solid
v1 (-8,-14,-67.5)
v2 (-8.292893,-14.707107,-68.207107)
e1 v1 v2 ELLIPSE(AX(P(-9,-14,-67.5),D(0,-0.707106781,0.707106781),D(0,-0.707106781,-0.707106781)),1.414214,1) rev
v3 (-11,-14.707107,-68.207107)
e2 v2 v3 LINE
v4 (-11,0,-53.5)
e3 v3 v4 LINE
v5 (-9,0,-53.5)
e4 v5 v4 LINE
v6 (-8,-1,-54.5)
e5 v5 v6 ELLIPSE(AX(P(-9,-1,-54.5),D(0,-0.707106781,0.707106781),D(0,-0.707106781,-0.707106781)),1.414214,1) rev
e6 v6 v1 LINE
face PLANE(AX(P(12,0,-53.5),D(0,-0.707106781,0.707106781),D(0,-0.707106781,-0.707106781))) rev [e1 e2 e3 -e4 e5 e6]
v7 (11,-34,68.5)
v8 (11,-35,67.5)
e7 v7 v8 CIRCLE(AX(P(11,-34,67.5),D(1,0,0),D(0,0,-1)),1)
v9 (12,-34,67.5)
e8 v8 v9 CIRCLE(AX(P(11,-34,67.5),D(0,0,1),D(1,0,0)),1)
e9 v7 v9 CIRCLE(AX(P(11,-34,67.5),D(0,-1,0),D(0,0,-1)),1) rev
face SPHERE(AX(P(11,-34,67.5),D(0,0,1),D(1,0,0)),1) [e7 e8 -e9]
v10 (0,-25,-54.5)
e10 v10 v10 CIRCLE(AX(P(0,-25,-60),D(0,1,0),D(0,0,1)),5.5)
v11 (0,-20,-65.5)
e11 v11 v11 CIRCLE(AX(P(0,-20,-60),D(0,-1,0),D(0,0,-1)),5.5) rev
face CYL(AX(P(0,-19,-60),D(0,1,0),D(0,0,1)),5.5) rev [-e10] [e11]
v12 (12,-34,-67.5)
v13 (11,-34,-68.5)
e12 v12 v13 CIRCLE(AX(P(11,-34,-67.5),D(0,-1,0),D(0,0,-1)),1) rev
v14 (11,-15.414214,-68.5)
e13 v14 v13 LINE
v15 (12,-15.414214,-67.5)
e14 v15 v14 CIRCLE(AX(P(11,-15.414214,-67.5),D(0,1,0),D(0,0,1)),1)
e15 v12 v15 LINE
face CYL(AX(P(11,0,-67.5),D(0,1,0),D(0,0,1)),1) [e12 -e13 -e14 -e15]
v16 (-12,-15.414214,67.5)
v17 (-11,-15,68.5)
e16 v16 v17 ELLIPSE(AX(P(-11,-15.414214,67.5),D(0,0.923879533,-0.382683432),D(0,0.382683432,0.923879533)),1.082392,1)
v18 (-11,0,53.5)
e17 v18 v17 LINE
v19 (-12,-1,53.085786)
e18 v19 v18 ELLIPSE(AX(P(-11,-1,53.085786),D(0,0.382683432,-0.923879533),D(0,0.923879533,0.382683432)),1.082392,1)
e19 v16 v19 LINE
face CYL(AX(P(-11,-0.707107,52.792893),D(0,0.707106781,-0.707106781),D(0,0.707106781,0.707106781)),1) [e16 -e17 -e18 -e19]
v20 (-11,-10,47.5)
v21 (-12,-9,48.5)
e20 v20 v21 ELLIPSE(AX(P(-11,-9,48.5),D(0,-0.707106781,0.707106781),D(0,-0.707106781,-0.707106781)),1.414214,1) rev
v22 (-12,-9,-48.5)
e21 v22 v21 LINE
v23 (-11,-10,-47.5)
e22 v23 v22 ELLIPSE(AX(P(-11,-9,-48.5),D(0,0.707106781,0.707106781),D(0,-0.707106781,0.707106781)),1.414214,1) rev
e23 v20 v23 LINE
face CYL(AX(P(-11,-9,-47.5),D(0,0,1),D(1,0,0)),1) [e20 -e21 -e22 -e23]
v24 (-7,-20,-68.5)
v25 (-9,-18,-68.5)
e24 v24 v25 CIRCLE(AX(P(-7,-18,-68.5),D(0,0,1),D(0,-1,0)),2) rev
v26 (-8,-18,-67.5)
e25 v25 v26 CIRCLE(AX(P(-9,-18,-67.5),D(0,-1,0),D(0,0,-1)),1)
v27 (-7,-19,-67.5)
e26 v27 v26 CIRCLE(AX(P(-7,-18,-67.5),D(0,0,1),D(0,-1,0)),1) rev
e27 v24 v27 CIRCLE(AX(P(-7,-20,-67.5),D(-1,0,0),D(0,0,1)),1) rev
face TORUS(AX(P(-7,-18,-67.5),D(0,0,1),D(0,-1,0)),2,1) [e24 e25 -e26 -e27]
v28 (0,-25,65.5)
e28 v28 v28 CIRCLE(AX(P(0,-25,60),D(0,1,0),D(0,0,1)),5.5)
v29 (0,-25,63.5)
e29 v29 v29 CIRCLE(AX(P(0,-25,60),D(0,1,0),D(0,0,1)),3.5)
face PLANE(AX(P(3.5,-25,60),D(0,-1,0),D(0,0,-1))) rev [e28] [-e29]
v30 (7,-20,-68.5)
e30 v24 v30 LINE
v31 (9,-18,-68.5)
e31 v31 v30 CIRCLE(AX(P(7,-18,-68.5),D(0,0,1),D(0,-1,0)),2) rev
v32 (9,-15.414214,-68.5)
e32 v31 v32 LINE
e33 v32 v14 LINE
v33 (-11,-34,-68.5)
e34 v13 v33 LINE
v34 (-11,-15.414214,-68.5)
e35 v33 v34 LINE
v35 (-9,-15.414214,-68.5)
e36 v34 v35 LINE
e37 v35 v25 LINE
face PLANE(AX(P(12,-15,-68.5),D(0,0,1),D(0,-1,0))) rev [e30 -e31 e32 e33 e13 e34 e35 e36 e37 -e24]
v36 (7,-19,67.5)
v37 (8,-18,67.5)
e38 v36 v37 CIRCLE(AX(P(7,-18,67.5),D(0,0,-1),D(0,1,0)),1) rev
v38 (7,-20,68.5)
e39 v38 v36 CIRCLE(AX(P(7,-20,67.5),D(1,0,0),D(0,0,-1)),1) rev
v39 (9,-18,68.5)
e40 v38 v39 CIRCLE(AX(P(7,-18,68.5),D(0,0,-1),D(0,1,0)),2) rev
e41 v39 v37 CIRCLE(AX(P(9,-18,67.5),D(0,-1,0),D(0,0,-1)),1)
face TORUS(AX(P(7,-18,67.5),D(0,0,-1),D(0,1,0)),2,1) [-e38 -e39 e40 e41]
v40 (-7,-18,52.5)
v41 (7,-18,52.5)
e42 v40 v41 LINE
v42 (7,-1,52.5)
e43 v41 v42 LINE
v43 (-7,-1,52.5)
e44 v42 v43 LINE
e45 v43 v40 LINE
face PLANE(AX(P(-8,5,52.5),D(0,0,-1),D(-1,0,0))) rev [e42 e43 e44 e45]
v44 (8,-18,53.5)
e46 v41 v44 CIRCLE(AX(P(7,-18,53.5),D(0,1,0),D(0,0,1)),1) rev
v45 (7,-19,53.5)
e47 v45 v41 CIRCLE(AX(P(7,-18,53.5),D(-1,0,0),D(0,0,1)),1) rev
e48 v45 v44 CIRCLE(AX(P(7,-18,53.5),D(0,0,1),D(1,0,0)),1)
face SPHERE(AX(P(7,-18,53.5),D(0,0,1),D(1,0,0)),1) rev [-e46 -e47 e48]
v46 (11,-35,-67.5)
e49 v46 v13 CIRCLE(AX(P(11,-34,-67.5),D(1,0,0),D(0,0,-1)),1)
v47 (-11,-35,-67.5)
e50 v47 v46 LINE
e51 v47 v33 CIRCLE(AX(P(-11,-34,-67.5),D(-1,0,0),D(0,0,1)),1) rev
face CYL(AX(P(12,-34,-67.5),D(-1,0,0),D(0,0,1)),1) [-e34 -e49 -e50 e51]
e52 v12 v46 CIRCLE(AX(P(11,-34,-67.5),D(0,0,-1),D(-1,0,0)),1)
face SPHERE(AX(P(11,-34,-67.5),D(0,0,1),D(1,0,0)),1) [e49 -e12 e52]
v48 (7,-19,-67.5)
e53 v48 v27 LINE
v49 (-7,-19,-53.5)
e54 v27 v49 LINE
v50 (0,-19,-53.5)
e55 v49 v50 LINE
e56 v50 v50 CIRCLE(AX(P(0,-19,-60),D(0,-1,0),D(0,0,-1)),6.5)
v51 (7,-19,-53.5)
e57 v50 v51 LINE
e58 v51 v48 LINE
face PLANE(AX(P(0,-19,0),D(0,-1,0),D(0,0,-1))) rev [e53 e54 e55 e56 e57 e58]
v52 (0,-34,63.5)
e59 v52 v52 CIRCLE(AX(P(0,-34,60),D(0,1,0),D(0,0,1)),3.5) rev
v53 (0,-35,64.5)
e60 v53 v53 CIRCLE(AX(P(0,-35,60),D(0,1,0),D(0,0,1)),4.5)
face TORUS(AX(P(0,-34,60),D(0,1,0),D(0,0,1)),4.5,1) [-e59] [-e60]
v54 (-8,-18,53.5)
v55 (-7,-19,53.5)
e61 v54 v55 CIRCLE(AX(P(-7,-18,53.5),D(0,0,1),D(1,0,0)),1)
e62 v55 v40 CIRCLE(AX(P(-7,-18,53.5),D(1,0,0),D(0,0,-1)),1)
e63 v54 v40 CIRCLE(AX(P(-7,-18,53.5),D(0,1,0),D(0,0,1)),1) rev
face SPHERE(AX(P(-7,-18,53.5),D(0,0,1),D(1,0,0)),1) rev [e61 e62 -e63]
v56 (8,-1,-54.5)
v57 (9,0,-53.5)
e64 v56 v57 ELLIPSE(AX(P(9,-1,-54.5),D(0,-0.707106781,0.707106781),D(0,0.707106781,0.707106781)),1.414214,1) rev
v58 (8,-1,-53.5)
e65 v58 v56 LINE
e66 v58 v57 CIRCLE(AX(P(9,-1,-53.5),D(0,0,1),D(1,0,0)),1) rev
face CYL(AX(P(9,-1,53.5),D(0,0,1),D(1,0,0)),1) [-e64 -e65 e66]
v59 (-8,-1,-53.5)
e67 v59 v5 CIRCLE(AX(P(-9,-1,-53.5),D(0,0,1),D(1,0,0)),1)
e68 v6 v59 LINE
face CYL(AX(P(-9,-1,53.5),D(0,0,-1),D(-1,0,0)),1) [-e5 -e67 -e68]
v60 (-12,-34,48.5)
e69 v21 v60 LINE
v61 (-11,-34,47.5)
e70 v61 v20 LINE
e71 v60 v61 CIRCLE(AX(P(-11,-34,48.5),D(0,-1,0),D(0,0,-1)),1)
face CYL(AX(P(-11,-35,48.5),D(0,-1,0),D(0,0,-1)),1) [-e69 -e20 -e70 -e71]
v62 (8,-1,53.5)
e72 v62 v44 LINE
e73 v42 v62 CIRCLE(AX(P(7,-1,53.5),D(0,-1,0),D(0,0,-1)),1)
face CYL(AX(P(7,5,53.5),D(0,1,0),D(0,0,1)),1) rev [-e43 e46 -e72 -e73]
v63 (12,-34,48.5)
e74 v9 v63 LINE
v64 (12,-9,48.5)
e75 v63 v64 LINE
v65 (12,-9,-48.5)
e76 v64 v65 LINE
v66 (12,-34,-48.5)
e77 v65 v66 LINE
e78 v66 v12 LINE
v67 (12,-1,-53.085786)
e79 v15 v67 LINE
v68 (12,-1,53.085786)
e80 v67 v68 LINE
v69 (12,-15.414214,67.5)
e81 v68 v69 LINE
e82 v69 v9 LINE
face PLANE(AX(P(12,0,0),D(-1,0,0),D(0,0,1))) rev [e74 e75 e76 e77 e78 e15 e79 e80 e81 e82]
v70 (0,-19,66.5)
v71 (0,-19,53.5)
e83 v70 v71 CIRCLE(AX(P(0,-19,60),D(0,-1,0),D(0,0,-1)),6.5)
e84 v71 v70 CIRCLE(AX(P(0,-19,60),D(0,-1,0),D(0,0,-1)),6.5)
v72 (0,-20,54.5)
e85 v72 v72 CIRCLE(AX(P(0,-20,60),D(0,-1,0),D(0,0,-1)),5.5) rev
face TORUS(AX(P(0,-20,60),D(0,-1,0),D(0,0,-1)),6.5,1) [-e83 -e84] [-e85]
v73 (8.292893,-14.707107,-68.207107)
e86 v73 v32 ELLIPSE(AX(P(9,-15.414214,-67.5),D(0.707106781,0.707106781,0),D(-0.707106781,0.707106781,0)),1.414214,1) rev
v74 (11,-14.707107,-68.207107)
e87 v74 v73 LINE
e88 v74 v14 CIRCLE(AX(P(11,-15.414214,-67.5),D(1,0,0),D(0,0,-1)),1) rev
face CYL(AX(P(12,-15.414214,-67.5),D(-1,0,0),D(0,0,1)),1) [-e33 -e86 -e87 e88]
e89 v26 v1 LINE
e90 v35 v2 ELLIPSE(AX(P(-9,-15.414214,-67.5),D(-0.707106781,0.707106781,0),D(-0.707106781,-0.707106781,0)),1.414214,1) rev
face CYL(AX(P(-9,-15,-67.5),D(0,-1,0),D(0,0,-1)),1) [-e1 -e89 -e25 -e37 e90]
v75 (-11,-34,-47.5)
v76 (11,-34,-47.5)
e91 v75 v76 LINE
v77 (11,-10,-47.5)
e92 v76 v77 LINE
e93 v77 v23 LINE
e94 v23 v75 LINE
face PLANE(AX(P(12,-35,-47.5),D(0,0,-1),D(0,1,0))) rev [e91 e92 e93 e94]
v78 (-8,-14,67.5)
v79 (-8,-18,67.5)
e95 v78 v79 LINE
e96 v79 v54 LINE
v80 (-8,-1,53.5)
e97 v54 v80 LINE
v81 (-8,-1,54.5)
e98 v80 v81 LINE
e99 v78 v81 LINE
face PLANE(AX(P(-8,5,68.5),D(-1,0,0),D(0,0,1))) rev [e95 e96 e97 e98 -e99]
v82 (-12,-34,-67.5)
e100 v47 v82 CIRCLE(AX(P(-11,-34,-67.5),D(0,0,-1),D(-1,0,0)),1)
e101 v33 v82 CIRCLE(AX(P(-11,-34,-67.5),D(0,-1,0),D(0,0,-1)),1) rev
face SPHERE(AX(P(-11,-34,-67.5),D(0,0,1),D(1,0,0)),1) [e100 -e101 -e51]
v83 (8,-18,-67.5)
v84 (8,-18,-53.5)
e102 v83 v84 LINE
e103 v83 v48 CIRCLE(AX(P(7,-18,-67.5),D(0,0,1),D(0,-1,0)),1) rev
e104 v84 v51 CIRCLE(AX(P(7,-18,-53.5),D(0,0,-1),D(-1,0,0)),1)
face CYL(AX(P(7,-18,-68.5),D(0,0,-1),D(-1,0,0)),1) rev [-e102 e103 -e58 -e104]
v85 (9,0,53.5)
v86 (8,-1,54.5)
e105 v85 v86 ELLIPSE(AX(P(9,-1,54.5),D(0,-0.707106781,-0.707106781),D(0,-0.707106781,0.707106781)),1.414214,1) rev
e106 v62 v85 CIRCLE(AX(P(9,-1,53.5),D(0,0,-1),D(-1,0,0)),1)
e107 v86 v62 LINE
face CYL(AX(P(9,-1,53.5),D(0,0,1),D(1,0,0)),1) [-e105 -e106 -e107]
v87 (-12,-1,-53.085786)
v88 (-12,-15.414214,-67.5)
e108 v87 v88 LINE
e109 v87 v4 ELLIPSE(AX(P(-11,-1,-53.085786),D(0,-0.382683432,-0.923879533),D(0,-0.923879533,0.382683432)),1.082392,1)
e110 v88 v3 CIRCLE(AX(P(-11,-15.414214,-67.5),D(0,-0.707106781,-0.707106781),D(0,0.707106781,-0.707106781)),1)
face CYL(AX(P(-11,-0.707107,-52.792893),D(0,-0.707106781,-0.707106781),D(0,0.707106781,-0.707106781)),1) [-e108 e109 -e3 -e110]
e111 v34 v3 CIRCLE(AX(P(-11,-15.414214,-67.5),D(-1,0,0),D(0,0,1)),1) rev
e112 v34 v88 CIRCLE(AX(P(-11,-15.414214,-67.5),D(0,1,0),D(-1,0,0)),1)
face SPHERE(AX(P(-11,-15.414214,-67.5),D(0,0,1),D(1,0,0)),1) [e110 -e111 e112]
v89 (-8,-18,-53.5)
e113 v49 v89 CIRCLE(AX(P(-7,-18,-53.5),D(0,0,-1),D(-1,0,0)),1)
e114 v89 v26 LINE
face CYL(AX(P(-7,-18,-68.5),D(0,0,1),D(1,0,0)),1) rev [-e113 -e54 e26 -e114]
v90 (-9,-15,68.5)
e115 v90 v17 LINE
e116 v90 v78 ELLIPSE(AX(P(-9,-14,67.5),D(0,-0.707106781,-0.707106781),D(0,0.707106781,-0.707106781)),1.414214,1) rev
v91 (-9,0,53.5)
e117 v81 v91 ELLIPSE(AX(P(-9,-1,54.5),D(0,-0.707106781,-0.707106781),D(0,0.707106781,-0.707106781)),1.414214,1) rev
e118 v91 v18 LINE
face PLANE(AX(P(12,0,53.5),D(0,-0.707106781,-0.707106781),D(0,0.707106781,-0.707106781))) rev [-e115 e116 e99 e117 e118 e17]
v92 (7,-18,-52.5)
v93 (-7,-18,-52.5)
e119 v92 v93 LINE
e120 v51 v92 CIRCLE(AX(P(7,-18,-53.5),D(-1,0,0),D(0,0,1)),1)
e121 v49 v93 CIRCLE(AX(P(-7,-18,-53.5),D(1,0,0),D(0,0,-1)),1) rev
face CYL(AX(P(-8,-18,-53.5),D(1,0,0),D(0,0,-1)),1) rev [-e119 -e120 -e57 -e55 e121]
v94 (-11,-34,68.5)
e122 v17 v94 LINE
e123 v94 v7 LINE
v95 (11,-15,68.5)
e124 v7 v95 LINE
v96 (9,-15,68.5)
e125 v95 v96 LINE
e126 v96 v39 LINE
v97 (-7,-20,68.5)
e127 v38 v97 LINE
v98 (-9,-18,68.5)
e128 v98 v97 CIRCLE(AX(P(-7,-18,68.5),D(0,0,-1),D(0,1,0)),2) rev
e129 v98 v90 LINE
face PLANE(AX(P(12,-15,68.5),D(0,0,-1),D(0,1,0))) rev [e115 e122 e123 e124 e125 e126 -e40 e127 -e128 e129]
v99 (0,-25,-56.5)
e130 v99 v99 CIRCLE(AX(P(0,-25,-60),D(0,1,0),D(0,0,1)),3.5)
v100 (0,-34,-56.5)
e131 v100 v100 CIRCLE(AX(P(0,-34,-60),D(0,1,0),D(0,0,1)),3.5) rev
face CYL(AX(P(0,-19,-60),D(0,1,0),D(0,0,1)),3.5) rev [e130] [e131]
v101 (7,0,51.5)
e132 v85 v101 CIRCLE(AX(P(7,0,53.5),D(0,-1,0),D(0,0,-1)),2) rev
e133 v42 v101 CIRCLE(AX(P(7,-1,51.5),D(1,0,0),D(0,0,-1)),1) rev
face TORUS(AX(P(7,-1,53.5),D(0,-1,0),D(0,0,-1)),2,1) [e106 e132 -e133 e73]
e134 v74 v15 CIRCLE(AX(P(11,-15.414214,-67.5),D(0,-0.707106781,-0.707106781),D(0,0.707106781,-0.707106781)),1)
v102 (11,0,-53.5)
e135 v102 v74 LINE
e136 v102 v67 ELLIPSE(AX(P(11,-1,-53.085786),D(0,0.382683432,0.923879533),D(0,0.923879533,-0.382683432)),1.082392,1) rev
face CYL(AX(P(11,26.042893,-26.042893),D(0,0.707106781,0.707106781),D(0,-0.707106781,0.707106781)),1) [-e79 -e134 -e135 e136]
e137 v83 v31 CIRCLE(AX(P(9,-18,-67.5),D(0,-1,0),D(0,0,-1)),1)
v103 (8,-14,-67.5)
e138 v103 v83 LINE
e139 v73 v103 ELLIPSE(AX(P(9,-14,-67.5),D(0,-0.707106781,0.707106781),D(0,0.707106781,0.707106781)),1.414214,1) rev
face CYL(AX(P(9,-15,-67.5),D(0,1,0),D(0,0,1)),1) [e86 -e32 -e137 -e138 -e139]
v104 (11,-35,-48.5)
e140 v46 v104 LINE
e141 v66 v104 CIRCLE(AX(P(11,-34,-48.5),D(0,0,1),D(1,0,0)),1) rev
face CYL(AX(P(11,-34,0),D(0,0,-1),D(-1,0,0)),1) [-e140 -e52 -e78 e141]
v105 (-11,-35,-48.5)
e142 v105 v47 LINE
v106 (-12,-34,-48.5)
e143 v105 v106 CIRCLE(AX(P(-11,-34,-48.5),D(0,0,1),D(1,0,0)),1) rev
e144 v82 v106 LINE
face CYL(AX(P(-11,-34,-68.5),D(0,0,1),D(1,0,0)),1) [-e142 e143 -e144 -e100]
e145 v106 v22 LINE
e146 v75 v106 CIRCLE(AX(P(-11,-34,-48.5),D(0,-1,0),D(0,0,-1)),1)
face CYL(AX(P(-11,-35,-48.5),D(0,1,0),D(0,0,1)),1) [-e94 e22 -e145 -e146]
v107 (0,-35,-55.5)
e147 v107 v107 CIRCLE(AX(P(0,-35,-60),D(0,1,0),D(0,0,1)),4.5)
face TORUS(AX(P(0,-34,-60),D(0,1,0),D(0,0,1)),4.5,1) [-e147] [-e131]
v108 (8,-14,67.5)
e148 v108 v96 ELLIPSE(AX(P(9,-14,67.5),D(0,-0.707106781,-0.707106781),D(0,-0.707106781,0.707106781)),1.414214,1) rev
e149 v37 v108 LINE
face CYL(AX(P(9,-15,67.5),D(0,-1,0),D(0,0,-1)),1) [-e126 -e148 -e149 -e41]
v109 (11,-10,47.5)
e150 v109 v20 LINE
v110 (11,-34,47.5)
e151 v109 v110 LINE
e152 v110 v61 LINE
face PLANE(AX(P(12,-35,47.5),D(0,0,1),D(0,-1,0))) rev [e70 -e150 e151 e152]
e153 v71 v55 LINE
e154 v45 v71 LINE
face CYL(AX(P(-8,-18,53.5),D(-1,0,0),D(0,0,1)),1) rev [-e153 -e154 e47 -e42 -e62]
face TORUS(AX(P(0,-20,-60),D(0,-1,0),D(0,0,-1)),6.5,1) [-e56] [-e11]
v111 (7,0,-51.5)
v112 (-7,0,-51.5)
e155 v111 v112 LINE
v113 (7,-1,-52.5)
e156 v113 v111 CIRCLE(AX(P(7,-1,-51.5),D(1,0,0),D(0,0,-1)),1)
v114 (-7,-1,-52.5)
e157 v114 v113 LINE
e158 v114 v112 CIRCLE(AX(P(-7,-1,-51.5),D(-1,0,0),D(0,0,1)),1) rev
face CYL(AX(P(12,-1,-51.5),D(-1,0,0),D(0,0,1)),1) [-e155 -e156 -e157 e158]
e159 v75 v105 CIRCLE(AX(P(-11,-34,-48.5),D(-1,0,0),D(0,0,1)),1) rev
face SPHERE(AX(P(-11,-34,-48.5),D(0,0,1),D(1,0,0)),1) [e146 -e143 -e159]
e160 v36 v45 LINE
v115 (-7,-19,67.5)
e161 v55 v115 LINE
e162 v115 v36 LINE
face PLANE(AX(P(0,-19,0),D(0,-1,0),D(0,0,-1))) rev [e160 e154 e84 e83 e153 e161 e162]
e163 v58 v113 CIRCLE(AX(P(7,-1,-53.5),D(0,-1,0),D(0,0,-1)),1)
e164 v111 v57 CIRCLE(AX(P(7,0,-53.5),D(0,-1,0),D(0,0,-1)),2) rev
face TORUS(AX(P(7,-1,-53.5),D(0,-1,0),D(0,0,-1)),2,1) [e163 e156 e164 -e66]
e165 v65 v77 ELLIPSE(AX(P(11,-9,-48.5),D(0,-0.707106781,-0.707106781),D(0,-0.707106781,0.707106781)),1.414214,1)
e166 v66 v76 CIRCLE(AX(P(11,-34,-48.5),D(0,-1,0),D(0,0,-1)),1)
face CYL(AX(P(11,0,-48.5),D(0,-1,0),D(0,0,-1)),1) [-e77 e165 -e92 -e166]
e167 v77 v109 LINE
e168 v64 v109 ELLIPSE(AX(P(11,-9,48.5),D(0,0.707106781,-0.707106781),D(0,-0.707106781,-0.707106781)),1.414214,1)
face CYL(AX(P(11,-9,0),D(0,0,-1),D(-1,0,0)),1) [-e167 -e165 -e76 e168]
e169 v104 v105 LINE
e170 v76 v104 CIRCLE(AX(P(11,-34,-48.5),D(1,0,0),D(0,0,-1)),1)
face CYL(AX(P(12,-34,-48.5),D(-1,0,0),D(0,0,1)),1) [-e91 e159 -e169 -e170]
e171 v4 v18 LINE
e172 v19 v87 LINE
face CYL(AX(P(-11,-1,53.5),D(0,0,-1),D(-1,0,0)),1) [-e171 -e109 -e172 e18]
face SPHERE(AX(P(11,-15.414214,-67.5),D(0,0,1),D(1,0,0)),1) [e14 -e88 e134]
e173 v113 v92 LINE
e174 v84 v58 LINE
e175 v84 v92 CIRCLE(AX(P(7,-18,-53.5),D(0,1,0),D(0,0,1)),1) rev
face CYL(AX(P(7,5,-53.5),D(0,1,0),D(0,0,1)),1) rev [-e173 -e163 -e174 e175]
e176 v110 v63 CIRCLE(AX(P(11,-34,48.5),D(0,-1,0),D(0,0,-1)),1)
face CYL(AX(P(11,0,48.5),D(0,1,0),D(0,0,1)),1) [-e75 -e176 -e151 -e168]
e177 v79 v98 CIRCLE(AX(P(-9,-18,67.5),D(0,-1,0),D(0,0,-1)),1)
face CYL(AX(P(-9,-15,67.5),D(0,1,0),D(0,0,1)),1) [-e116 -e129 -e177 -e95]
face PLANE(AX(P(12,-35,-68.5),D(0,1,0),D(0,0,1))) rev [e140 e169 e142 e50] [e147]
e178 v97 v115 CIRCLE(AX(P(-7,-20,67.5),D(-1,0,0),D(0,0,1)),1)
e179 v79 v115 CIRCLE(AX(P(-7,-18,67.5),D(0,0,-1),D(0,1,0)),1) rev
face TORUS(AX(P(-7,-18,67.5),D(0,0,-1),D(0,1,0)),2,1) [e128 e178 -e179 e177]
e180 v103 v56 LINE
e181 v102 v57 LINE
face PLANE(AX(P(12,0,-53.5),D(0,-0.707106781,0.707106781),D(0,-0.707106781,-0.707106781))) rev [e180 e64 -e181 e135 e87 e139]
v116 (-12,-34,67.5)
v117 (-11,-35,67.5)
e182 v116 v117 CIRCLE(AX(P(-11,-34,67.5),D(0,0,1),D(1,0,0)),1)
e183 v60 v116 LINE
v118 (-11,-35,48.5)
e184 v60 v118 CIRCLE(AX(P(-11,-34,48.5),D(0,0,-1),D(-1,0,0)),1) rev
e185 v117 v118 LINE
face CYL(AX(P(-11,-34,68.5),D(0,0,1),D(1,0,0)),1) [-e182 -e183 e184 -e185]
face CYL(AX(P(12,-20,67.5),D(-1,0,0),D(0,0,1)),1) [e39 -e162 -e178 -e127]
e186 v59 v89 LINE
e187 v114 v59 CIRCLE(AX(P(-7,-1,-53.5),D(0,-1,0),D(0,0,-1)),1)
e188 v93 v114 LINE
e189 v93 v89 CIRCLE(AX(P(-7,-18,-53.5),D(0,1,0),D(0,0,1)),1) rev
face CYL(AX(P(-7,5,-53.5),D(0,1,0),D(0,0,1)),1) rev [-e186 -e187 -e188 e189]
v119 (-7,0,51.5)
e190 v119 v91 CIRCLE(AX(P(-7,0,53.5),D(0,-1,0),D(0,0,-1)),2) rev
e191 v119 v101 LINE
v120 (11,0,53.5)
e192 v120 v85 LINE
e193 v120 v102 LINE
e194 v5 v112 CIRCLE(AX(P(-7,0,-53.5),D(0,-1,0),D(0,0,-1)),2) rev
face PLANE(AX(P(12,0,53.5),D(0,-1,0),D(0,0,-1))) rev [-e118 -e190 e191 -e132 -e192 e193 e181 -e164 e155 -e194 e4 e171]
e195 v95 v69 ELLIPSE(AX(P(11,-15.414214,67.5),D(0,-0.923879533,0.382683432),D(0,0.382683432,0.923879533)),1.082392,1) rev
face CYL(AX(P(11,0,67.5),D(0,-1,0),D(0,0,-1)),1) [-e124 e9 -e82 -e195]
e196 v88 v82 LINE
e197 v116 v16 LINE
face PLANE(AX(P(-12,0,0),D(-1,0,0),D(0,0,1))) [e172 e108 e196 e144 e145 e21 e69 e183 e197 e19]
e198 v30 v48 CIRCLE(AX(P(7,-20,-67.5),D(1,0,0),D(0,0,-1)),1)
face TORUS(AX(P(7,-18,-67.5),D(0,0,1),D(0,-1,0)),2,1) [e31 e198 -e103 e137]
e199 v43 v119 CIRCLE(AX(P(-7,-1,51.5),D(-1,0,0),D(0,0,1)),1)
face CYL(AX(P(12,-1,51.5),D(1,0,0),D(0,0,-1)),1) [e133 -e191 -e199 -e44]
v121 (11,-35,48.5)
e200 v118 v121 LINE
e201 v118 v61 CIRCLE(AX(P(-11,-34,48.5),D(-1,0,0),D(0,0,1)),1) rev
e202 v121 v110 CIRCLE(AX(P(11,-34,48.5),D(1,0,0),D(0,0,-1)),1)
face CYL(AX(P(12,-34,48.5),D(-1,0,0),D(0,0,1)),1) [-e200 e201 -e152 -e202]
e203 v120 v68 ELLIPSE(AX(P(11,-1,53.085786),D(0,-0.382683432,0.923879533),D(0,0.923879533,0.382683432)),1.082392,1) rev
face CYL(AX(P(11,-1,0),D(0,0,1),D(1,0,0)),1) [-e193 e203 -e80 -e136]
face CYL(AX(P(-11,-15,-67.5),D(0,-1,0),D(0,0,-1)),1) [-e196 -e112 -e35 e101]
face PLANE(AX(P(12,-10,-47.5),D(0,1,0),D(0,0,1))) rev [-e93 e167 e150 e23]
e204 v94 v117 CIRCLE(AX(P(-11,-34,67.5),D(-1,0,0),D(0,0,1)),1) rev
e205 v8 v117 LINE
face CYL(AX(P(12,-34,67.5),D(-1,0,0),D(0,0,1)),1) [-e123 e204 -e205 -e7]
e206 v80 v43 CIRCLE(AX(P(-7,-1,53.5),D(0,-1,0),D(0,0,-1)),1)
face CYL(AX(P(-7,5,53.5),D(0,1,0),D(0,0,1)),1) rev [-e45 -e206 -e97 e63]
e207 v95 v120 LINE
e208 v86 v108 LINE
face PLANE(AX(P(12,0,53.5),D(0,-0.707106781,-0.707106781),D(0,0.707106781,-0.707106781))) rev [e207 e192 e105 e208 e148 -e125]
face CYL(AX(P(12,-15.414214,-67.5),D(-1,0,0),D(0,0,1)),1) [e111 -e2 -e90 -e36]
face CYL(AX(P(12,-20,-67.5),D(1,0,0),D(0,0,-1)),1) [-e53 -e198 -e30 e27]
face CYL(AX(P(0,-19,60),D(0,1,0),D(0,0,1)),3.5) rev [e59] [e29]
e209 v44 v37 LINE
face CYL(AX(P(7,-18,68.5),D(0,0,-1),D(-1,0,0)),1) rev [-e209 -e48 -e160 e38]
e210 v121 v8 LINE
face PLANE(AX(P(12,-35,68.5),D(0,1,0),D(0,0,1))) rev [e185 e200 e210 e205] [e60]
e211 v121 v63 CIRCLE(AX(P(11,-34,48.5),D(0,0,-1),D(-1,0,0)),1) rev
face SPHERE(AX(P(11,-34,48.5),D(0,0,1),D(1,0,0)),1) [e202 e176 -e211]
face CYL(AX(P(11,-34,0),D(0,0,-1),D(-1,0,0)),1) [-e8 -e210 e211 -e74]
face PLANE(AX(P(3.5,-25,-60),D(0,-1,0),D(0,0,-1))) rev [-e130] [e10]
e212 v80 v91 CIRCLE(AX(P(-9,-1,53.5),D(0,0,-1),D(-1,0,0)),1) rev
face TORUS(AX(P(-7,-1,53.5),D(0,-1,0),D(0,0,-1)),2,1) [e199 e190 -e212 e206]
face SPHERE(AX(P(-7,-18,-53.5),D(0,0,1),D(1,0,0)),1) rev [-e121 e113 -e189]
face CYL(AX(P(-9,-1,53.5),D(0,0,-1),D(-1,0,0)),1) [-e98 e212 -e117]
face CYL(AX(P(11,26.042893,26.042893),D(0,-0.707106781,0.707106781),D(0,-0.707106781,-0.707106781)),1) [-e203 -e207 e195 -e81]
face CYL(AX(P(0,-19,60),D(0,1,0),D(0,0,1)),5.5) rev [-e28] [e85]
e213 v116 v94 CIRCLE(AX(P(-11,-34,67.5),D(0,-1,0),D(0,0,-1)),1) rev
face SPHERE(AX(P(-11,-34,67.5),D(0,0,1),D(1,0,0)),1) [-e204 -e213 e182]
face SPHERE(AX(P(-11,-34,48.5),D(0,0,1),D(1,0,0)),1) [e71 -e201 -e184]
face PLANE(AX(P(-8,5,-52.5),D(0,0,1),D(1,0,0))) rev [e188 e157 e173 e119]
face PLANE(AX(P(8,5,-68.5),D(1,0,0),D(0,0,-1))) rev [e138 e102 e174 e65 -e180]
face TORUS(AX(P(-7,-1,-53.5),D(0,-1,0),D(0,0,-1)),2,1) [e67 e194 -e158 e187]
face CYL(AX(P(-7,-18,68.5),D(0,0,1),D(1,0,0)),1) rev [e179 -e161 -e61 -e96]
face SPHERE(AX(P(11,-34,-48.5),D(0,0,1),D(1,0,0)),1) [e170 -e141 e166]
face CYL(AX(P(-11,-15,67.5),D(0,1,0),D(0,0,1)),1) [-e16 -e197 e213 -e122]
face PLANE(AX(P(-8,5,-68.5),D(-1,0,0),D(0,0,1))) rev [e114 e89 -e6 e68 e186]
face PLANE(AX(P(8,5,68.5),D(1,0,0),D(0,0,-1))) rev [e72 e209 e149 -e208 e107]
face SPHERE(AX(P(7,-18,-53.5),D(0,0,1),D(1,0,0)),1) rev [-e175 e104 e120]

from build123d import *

# Parameters (mm, degrees)
EXTRUDE_1_DEPTH             = 12
SKETCH_2_W                  = 16
SKETCH_2_H                  = 16
CUT_EXTRUDE_1_DEPTH         = 24
HOLE_WIZARD_C_3_D           = 7
HOLE_WIZARD_C_3_CBORE_D     = 11
HOLE_WIZARD_C_3_CBORE_DEPTH = 6
FILLET_1_R                  = 1


with BuildPart() as part:
    # 草图1 → 凸台-拉伸1 (new, symmetric)
    with BuildSketch(Plane(origin=(0, 0, 0), x_dir=(0, 0, -1), z_dir=(1, 0, 0))):
        Polygon((-53.5, 0), (53.5, 0), (68.5, -15), (68.5, -35), (47.5, -35), (47.5, -10), (-47.5, -10), (-47.5, -35), (-68.5, -35), (-68.5, -15), align=None)
    extrude(amount=EXTRUDE_1_DEPTH, both=True)

    # 草图2 → 切除-拉伸1 (cut)
    with BuildSketch(Plane(origin=(0, -19, 0), x_dir=(-1, 0, 0), z_dir=(0, -1, 0))):
        with Locations((0, -60.5)):
            Rectangle(SKETCH_2_W, SKETCH_2_H)
        with Locations((0, 60.5)):
            Rectangle(SKETCH_2_W, SKETCH_2_H)
    extrude(amount=-CUT_EXTRUDE_1_DEPTH, mode=Mode.SUBTRACT)

    # 打孔尺寸根据六角头螺栓 C 级的类型3 (through all)
    with Locations(Plane(origin=(0, -19, 0), x_dir=(1, 0, 0), z_dir=(0, 1, 0))):
        with Locations((0, -60), (0, 60)):
            CounterBoreHole(HOLE_WIZARD_C_3_D / 2, HOLE_WIZARD_C_3_CBORE_D / 2, HOLE_WIZARD_C_3_CBORE_DEPTH)

    # 圆角1
    fillet_1_edges = [part.edges().sort_by_distance(p)[0] for p in [
        (12, -7.5, 61),
        (-12, -22.5, -47.5),
        (-12, -10, 0),
        (-12, -22.5, 47.5),
        (-12, -35, 58),
        (-12, -25, 68.5),
        (-12, -7.5, 61),
        (-12, 0, 0),
        (-12, -7.5, -61),
        (12, -25, 68.5),
        (12, -35, 58),
        (10, -15, -68.5),
        (0, -35, -68.5),
        (0, -35, -47.5),
        (0, -35, 47.5),
        (0, -35, 68.5),
        (12, -22.5, 47.5),
        (12, -10, 0),
        (12, -22.5, -47.5),
        (12, -35, -58),
        (8, -17, 68.5),
        (-8, -17, 68.5),
        (12, -25, -68.5),
        (0, 0, 52.5),
        (8, -9.5, 52.5),
        (-8, 0, 53),
        (-8, -9.5, 52.5),
        (8, 0, 53),
        (-8, -19, 60.5),
        (0, -19, 52.5),
        (8, -19, 60.5),
        (0, -19, 68.5),
        (12, -7.5, -61),
        (-10, -15, -68.5),
        (8, -17, -68.5),
        (-8, -17, -68.5),
        (0, 0, -52.5),
        (-8, -9.5, -52.5),
        (-8, 0, -53),
        (8, 0, -53),
        (8, -9.5, -52.5),
        (0, -19, -68.5),
        (8, -19, -60.5),
        (0, -19, -52.5),
        (-8, -19, -60.5),
        (-5.5, -19, -60),
        (3.5, -35, -60),
        (12, 0, 0),
        (-5.5, -19, 60),
        (3.5, -35, 60),
        (-12, -25, -68.5),
        (-12, -35, -58),
    ]]
    fillet(fillet_1_edges, radius=FILLET_1_R - 0.0001)  # a hair under: the kernel refuses the full size


solid = part.part
